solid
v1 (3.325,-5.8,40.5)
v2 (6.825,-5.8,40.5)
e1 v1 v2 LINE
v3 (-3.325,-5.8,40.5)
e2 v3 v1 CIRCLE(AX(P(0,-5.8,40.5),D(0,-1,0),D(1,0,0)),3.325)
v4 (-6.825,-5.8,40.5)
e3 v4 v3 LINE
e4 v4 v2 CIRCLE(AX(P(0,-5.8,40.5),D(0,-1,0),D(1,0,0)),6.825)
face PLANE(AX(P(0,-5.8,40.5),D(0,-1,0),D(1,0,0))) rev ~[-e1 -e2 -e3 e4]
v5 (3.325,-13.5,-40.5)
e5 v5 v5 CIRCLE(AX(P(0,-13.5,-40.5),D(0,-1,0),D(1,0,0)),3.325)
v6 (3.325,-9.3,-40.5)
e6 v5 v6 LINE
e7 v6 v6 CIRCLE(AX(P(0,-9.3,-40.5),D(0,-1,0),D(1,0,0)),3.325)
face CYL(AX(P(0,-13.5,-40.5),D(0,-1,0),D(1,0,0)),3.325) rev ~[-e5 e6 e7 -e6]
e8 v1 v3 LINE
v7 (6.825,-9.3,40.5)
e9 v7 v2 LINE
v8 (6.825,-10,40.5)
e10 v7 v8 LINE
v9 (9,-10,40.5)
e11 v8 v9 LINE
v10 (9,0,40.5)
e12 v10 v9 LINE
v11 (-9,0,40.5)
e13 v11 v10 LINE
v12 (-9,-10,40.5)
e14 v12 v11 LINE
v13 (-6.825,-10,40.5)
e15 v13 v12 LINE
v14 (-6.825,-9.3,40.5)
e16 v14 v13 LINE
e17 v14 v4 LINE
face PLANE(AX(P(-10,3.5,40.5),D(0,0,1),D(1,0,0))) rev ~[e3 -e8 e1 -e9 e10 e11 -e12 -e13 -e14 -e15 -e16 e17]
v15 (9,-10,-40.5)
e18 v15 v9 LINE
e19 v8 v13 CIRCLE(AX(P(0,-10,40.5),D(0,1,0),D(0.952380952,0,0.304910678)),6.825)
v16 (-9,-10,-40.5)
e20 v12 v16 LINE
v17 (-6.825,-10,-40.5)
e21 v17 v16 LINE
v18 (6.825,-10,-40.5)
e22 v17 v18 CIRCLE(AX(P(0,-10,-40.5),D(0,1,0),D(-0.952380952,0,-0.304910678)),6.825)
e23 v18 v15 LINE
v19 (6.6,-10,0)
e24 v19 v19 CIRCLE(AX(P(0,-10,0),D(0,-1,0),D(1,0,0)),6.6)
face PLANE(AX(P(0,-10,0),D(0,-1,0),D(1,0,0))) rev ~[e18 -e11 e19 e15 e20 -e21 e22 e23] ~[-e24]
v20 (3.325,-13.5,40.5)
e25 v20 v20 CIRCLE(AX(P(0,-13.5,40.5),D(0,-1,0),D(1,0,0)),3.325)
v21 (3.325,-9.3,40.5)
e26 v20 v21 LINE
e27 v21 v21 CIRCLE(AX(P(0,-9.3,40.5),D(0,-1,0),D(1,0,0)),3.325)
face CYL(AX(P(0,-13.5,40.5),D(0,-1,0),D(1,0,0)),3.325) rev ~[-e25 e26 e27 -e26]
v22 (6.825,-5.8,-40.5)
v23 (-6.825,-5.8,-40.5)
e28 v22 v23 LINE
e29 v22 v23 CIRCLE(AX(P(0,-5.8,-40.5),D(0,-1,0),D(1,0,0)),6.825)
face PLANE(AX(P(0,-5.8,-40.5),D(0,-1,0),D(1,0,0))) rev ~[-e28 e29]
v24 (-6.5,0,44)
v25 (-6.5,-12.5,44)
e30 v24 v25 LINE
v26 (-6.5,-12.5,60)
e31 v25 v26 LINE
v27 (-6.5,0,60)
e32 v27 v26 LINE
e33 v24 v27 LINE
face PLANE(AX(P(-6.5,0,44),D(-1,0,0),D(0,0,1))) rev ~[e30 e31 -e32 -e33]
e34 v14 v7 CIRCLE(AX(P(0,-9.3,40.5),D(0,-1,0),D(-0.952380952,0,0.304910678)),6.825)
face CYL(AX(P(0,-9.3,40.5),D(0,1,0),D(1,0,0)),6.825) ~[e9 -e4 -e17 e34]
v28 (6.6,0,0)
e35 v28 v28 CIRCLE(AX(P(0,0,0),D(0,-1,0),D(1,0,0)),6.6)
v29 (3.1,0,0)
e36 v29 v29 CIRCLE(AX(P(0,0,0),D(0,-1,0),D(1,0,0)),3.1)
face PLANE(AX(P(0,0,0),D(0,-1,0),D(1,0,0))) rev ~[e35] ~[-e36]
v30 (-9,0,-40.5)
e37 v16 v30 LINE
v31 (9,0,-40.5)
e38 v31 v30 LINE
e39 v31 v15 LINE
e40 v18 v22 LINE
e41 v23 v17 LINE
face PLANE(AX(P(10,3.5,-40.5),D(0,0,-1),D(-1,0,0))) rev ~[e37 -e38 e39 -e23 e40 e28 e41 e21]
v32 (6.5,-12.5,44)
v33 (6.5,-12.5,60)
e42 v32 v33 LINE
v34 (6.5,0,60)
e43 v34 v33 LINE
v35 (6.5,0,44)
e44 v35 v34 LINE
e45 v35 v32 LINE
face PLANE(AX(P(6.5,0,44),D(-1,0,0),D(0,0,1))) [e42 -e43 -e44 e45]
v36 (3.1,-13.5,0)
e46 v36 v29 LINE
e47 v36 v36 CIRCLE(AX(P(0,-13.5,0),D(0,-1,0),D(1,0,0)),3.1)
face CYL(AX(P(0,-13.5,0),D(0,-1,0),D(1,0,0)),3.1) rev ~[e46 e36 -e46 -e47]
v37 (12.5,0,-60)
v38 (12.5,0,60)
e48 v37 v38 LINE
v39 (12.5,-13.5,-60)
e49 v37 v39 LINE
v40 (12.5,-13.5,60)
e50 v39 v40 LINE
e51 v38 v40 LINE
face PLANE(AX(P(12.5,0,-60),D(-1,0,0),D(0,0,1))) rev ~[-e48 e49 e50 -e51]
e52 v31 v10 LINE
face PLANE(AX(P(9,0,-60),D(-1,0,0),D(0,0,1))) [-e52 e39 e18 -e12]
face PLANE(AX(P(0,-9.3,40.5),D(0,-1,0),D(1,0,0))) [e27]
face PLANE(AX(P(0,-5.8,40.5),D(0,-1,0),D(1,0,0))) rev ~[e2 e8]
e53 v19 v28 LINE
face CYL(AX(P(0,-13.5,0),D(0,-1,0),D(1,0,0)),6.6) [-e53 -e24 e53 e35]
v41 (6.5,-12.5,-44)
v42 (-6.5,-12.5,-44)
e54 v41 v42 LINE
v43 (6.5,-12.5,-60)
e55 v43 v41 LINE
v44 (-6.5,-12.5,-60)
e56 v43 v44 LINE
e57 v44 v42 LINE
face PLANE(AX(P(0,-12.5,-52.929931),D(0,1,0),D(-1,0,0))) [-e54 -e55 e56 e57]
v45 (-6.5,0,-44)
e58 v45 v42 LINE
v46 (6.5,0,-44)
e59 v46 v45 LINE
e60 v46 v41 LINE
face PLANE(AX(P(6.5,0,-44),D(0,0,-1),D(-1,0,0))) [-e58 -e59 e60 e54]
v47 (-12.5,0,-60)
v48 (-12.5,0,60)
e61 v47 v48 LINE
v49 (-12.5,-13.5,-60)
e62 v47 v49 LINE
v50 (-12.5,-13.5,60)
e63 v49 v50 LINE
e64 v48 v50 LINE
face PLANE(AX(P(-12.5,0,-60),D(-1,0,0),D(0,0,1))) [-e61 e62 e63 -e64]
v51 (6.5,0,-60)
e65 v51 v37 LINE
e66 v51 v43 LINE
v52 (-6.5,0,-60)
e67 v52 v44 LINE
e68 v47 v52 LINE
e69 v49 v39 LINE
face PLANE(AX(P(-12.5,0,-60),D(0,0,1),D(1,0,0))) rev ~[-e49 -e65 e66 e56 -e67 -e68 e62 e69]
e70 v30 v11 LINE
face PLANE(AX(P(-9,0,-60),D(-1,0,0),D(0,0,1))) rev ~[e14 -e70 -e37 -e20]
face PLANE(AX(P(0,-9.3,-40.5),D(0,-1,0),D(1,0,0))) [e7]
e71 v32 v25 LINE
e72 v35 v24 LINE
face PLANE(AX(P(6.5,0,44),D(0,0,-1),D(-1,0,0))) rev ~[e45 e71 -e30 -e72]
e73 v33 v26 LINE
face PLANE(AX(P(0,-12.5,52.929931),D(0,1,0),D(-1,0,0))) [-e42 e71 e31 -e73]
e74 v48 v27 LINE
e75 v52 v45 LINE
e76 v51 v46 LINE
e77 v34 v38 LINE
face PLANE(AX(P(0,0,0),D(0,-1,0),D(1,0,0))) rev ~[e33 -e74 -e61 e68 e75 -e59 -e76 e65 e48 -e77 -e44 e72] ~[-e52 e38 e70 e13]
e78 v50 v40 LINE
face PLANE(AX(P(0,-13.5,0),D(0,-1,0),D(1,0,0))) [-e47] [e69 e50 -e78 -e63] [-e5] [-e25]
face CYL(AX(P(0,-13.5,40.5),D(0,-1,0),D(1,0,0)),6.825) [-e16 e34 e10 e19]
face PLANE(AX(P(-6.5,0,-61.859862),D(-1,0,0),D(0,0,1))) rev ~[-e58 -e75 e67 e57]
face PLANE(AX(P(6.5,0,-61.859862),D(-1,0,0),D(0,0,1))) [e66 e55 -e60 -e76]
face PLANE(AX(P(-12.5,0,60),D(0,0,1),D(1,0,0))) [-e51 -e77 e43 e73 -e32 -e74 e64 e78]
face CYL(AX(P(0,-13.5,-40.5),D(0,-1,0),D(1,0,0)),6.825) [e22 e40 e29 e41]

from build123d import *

# Parameters (mm, degrees)
F0_W        = 25
F0_H        = 120
F1_DEPTH    = 13.5
F2_R        = 3.1
F3_DEPTH    = 13.501
F4_W        = 13
F4_H        = 17.8598619506
F5_DEPTH    = 12.5
F6_R        = 3.325
F7_DEPTH    = 4.2
F8_T        = 3.5
F8_T3_DEPTH = 19.5
F8_T5_DEPTH = 23
F8_T7_DEPTH = 20
F8_T9_DEPTH = 23


# Not quite as in the source:
# - a shell that OpenCascade refuses in one call is made with other operations: the cavity is built on its own and cut out


with BuildPart() as f1:
    # F0 (on Front) → F1 (new body)
    with BuildSketch(Plane.XZ):
        Rectangle(F0_W, F0_H)
    extrude(amount=F1_DEPTH)

    # F2 (on face) → F3 (cut, through all)
    with BuildSketch(Plane.XZ.offset(13.5)):
        Circle(F2_R)
    extrude(amount=-F3_DEPTH, mode=Mode.SUBTRACT)

    # F4 (on face) → F5 (cut)
    with BuildSketch(Plane(origin=(0, 0, 0), x_dir=(-1, 0, 0), z_dir=(0, 1, 0))):
        with Locations((0, 52.9299309753)):
            Rectangle(F4_W, F4_H)
        with Locations((0, -52.9299309753)):
            Rectangle(F4_W, F4_H)
    extrude(amount=-F5_DEPTH, mode=Mode.SUBTRACT)

    # F6 (on face) → F7 (cut)
    with BuildSketch(Plane.XZ.offset(13.5)):
        with Locations((0, -40.5)):
            Circle(F6_R)
        with Locations((0, 40.5)):
            Circle(F6_R)
    extrude(amount=-F7_DEPTH, mode=Mode.SUBTRACT)

    # F8: shell of thickness 3.5, made by hand


with BuildPart() as f8_core1:
    # F8_t2: copy of F1
    add(f1.part)

    # the walls: a layer under each face that stays
    f8_faces = [f8_core1.faces().sort_by_distance(p)[0] for p in [
        (12.5, -6.75, 0),
        (-8.3333333333, -11.25, -60),
        (8.3333333333, -11.25, 60),
        (-8.3333333333, -13.5, -40),
        (-6.5, -6.25, -52),
        (0, -12.5, -52),
        (6.5, -6.25, -52),
        (-12.5, -6.75, 0),
        (6.5, -6.25, 52),
        (0, -12.5, 52),
        (-6.5, -6.25, 52),
        (0, -6.25, -44),
        (0, -6.25, 44),
        (-3.1, -6.75, 0),
        (-3.325, -11.4, -40.5),
        (-3.325, -11.4, 40.5),
        (0, -9.3, -40.5),
        (0, -9.3, 40.5),
    ]]
    thicken(f8_faces, amount=-F8_T, mode=Mode.SUBTRACT)

    # F8_s4 → F8_t3 (cut)
    with BuildSketch(Plane.XZ.offset(-3.5)):
        Polygon((-6.465, -44.035), (-10, -44), (-10, -40.5), (-6.5, -40.5), align=None)
        Polygon((6.465, -44.035), (10, -44), (10, -40.5), (6.5, -40.5), align=None)
        Polygon((6.465, 44.035), (10, 44), (10, 40.5), (6.5, 40.5), align=None)
        Polygon((-6.465, 44.035), (-10, 44), (-10, 40.5), (-6.5, 40.5), align=None)
    extrude(amount=F8_T3_DEPTH, mode=Mode.SUBTRACT)

    # F8_s6 → F8_t5 (cut)
    with BuildSketch(Plane.XY.offset(-63.5)):
        Polygon((-6.465, -12.465), (-10, -12.5), (-10, -16), (-6.5, -16), align=None)
        Polygon((6.465, -12.465), (6.5, -16), (10, -16), (10, -12.5), align=None)
    extrude(amount=F8_T5_DEPTH, mode=Mode.SUBTRACT)

    # F8_s8 → F8_t7 (cut)
    with BuildSketch(Plane.YZ.offset(-10)):
        Polygon((-12.465, -44.035), (-16, -44), (-16, -40.5), (-12.5, -40.5), align=None)
        Polygon((-12.465, 44.035), (-16, 44), (-16, 40.5), (-12.5, 40.5), align=None)
    extrude(amount=F8_T7_DEPTH, mode=Mode.SUBTRACT)

    # F8_s10 → F8_t9 (cut)
    with BuildSketch(Plane.XY.offset(40.5)):
        Polygon((6.465, -12.465), (10, -12.5), (10, -16), (6.5, -16), align=None)
        Polygon((-6.465, -12.465), (-6.5, -16), (-10, -16), (-10, -12.5), align=None)
    extrude(amount=F8_T9_DEPTH, mode=Mode.SUBTRACT)

    # F8_s11 → F8_t12 (revolve, cut)
    with BuildSketch(Plane.XY.offset(-40.5)):
        Polygon((3.29, -9.335), (6.825, -9.3), (6.825, -5.8), (3.325, -5.8), align=None)
    revolve(axis=Axis((0, -9.3, -40.5), (0, -1, 0)), mode=Mode.SUBTRACT)

    # F8_s13 → F8_t14 (revolve, cut)
    with BuildSketch(Plane.XY.offset(40.5)):
        Polygon((3.29, -9.335), (6.825, -9.3), (6.825, -5.8), (3.325, -5.8), align=None)
    revolve(axis=Axis((0, -9.3, 40.5), (0, -1, 0)), mode=Mode.SUBTRACT)


with BuildPart() as f1_1:
    add(f1.part)

    # what is left inside the walls is the cavity
    f8_cavity = [f8_core1.part.solids().sort_by_distance(p)[0] for p in [
        (0, -0.035, -13.5),
    ]]
    add(f8_cavity, mode=Mode.SUBTRACT)


solid = f1_1.part
